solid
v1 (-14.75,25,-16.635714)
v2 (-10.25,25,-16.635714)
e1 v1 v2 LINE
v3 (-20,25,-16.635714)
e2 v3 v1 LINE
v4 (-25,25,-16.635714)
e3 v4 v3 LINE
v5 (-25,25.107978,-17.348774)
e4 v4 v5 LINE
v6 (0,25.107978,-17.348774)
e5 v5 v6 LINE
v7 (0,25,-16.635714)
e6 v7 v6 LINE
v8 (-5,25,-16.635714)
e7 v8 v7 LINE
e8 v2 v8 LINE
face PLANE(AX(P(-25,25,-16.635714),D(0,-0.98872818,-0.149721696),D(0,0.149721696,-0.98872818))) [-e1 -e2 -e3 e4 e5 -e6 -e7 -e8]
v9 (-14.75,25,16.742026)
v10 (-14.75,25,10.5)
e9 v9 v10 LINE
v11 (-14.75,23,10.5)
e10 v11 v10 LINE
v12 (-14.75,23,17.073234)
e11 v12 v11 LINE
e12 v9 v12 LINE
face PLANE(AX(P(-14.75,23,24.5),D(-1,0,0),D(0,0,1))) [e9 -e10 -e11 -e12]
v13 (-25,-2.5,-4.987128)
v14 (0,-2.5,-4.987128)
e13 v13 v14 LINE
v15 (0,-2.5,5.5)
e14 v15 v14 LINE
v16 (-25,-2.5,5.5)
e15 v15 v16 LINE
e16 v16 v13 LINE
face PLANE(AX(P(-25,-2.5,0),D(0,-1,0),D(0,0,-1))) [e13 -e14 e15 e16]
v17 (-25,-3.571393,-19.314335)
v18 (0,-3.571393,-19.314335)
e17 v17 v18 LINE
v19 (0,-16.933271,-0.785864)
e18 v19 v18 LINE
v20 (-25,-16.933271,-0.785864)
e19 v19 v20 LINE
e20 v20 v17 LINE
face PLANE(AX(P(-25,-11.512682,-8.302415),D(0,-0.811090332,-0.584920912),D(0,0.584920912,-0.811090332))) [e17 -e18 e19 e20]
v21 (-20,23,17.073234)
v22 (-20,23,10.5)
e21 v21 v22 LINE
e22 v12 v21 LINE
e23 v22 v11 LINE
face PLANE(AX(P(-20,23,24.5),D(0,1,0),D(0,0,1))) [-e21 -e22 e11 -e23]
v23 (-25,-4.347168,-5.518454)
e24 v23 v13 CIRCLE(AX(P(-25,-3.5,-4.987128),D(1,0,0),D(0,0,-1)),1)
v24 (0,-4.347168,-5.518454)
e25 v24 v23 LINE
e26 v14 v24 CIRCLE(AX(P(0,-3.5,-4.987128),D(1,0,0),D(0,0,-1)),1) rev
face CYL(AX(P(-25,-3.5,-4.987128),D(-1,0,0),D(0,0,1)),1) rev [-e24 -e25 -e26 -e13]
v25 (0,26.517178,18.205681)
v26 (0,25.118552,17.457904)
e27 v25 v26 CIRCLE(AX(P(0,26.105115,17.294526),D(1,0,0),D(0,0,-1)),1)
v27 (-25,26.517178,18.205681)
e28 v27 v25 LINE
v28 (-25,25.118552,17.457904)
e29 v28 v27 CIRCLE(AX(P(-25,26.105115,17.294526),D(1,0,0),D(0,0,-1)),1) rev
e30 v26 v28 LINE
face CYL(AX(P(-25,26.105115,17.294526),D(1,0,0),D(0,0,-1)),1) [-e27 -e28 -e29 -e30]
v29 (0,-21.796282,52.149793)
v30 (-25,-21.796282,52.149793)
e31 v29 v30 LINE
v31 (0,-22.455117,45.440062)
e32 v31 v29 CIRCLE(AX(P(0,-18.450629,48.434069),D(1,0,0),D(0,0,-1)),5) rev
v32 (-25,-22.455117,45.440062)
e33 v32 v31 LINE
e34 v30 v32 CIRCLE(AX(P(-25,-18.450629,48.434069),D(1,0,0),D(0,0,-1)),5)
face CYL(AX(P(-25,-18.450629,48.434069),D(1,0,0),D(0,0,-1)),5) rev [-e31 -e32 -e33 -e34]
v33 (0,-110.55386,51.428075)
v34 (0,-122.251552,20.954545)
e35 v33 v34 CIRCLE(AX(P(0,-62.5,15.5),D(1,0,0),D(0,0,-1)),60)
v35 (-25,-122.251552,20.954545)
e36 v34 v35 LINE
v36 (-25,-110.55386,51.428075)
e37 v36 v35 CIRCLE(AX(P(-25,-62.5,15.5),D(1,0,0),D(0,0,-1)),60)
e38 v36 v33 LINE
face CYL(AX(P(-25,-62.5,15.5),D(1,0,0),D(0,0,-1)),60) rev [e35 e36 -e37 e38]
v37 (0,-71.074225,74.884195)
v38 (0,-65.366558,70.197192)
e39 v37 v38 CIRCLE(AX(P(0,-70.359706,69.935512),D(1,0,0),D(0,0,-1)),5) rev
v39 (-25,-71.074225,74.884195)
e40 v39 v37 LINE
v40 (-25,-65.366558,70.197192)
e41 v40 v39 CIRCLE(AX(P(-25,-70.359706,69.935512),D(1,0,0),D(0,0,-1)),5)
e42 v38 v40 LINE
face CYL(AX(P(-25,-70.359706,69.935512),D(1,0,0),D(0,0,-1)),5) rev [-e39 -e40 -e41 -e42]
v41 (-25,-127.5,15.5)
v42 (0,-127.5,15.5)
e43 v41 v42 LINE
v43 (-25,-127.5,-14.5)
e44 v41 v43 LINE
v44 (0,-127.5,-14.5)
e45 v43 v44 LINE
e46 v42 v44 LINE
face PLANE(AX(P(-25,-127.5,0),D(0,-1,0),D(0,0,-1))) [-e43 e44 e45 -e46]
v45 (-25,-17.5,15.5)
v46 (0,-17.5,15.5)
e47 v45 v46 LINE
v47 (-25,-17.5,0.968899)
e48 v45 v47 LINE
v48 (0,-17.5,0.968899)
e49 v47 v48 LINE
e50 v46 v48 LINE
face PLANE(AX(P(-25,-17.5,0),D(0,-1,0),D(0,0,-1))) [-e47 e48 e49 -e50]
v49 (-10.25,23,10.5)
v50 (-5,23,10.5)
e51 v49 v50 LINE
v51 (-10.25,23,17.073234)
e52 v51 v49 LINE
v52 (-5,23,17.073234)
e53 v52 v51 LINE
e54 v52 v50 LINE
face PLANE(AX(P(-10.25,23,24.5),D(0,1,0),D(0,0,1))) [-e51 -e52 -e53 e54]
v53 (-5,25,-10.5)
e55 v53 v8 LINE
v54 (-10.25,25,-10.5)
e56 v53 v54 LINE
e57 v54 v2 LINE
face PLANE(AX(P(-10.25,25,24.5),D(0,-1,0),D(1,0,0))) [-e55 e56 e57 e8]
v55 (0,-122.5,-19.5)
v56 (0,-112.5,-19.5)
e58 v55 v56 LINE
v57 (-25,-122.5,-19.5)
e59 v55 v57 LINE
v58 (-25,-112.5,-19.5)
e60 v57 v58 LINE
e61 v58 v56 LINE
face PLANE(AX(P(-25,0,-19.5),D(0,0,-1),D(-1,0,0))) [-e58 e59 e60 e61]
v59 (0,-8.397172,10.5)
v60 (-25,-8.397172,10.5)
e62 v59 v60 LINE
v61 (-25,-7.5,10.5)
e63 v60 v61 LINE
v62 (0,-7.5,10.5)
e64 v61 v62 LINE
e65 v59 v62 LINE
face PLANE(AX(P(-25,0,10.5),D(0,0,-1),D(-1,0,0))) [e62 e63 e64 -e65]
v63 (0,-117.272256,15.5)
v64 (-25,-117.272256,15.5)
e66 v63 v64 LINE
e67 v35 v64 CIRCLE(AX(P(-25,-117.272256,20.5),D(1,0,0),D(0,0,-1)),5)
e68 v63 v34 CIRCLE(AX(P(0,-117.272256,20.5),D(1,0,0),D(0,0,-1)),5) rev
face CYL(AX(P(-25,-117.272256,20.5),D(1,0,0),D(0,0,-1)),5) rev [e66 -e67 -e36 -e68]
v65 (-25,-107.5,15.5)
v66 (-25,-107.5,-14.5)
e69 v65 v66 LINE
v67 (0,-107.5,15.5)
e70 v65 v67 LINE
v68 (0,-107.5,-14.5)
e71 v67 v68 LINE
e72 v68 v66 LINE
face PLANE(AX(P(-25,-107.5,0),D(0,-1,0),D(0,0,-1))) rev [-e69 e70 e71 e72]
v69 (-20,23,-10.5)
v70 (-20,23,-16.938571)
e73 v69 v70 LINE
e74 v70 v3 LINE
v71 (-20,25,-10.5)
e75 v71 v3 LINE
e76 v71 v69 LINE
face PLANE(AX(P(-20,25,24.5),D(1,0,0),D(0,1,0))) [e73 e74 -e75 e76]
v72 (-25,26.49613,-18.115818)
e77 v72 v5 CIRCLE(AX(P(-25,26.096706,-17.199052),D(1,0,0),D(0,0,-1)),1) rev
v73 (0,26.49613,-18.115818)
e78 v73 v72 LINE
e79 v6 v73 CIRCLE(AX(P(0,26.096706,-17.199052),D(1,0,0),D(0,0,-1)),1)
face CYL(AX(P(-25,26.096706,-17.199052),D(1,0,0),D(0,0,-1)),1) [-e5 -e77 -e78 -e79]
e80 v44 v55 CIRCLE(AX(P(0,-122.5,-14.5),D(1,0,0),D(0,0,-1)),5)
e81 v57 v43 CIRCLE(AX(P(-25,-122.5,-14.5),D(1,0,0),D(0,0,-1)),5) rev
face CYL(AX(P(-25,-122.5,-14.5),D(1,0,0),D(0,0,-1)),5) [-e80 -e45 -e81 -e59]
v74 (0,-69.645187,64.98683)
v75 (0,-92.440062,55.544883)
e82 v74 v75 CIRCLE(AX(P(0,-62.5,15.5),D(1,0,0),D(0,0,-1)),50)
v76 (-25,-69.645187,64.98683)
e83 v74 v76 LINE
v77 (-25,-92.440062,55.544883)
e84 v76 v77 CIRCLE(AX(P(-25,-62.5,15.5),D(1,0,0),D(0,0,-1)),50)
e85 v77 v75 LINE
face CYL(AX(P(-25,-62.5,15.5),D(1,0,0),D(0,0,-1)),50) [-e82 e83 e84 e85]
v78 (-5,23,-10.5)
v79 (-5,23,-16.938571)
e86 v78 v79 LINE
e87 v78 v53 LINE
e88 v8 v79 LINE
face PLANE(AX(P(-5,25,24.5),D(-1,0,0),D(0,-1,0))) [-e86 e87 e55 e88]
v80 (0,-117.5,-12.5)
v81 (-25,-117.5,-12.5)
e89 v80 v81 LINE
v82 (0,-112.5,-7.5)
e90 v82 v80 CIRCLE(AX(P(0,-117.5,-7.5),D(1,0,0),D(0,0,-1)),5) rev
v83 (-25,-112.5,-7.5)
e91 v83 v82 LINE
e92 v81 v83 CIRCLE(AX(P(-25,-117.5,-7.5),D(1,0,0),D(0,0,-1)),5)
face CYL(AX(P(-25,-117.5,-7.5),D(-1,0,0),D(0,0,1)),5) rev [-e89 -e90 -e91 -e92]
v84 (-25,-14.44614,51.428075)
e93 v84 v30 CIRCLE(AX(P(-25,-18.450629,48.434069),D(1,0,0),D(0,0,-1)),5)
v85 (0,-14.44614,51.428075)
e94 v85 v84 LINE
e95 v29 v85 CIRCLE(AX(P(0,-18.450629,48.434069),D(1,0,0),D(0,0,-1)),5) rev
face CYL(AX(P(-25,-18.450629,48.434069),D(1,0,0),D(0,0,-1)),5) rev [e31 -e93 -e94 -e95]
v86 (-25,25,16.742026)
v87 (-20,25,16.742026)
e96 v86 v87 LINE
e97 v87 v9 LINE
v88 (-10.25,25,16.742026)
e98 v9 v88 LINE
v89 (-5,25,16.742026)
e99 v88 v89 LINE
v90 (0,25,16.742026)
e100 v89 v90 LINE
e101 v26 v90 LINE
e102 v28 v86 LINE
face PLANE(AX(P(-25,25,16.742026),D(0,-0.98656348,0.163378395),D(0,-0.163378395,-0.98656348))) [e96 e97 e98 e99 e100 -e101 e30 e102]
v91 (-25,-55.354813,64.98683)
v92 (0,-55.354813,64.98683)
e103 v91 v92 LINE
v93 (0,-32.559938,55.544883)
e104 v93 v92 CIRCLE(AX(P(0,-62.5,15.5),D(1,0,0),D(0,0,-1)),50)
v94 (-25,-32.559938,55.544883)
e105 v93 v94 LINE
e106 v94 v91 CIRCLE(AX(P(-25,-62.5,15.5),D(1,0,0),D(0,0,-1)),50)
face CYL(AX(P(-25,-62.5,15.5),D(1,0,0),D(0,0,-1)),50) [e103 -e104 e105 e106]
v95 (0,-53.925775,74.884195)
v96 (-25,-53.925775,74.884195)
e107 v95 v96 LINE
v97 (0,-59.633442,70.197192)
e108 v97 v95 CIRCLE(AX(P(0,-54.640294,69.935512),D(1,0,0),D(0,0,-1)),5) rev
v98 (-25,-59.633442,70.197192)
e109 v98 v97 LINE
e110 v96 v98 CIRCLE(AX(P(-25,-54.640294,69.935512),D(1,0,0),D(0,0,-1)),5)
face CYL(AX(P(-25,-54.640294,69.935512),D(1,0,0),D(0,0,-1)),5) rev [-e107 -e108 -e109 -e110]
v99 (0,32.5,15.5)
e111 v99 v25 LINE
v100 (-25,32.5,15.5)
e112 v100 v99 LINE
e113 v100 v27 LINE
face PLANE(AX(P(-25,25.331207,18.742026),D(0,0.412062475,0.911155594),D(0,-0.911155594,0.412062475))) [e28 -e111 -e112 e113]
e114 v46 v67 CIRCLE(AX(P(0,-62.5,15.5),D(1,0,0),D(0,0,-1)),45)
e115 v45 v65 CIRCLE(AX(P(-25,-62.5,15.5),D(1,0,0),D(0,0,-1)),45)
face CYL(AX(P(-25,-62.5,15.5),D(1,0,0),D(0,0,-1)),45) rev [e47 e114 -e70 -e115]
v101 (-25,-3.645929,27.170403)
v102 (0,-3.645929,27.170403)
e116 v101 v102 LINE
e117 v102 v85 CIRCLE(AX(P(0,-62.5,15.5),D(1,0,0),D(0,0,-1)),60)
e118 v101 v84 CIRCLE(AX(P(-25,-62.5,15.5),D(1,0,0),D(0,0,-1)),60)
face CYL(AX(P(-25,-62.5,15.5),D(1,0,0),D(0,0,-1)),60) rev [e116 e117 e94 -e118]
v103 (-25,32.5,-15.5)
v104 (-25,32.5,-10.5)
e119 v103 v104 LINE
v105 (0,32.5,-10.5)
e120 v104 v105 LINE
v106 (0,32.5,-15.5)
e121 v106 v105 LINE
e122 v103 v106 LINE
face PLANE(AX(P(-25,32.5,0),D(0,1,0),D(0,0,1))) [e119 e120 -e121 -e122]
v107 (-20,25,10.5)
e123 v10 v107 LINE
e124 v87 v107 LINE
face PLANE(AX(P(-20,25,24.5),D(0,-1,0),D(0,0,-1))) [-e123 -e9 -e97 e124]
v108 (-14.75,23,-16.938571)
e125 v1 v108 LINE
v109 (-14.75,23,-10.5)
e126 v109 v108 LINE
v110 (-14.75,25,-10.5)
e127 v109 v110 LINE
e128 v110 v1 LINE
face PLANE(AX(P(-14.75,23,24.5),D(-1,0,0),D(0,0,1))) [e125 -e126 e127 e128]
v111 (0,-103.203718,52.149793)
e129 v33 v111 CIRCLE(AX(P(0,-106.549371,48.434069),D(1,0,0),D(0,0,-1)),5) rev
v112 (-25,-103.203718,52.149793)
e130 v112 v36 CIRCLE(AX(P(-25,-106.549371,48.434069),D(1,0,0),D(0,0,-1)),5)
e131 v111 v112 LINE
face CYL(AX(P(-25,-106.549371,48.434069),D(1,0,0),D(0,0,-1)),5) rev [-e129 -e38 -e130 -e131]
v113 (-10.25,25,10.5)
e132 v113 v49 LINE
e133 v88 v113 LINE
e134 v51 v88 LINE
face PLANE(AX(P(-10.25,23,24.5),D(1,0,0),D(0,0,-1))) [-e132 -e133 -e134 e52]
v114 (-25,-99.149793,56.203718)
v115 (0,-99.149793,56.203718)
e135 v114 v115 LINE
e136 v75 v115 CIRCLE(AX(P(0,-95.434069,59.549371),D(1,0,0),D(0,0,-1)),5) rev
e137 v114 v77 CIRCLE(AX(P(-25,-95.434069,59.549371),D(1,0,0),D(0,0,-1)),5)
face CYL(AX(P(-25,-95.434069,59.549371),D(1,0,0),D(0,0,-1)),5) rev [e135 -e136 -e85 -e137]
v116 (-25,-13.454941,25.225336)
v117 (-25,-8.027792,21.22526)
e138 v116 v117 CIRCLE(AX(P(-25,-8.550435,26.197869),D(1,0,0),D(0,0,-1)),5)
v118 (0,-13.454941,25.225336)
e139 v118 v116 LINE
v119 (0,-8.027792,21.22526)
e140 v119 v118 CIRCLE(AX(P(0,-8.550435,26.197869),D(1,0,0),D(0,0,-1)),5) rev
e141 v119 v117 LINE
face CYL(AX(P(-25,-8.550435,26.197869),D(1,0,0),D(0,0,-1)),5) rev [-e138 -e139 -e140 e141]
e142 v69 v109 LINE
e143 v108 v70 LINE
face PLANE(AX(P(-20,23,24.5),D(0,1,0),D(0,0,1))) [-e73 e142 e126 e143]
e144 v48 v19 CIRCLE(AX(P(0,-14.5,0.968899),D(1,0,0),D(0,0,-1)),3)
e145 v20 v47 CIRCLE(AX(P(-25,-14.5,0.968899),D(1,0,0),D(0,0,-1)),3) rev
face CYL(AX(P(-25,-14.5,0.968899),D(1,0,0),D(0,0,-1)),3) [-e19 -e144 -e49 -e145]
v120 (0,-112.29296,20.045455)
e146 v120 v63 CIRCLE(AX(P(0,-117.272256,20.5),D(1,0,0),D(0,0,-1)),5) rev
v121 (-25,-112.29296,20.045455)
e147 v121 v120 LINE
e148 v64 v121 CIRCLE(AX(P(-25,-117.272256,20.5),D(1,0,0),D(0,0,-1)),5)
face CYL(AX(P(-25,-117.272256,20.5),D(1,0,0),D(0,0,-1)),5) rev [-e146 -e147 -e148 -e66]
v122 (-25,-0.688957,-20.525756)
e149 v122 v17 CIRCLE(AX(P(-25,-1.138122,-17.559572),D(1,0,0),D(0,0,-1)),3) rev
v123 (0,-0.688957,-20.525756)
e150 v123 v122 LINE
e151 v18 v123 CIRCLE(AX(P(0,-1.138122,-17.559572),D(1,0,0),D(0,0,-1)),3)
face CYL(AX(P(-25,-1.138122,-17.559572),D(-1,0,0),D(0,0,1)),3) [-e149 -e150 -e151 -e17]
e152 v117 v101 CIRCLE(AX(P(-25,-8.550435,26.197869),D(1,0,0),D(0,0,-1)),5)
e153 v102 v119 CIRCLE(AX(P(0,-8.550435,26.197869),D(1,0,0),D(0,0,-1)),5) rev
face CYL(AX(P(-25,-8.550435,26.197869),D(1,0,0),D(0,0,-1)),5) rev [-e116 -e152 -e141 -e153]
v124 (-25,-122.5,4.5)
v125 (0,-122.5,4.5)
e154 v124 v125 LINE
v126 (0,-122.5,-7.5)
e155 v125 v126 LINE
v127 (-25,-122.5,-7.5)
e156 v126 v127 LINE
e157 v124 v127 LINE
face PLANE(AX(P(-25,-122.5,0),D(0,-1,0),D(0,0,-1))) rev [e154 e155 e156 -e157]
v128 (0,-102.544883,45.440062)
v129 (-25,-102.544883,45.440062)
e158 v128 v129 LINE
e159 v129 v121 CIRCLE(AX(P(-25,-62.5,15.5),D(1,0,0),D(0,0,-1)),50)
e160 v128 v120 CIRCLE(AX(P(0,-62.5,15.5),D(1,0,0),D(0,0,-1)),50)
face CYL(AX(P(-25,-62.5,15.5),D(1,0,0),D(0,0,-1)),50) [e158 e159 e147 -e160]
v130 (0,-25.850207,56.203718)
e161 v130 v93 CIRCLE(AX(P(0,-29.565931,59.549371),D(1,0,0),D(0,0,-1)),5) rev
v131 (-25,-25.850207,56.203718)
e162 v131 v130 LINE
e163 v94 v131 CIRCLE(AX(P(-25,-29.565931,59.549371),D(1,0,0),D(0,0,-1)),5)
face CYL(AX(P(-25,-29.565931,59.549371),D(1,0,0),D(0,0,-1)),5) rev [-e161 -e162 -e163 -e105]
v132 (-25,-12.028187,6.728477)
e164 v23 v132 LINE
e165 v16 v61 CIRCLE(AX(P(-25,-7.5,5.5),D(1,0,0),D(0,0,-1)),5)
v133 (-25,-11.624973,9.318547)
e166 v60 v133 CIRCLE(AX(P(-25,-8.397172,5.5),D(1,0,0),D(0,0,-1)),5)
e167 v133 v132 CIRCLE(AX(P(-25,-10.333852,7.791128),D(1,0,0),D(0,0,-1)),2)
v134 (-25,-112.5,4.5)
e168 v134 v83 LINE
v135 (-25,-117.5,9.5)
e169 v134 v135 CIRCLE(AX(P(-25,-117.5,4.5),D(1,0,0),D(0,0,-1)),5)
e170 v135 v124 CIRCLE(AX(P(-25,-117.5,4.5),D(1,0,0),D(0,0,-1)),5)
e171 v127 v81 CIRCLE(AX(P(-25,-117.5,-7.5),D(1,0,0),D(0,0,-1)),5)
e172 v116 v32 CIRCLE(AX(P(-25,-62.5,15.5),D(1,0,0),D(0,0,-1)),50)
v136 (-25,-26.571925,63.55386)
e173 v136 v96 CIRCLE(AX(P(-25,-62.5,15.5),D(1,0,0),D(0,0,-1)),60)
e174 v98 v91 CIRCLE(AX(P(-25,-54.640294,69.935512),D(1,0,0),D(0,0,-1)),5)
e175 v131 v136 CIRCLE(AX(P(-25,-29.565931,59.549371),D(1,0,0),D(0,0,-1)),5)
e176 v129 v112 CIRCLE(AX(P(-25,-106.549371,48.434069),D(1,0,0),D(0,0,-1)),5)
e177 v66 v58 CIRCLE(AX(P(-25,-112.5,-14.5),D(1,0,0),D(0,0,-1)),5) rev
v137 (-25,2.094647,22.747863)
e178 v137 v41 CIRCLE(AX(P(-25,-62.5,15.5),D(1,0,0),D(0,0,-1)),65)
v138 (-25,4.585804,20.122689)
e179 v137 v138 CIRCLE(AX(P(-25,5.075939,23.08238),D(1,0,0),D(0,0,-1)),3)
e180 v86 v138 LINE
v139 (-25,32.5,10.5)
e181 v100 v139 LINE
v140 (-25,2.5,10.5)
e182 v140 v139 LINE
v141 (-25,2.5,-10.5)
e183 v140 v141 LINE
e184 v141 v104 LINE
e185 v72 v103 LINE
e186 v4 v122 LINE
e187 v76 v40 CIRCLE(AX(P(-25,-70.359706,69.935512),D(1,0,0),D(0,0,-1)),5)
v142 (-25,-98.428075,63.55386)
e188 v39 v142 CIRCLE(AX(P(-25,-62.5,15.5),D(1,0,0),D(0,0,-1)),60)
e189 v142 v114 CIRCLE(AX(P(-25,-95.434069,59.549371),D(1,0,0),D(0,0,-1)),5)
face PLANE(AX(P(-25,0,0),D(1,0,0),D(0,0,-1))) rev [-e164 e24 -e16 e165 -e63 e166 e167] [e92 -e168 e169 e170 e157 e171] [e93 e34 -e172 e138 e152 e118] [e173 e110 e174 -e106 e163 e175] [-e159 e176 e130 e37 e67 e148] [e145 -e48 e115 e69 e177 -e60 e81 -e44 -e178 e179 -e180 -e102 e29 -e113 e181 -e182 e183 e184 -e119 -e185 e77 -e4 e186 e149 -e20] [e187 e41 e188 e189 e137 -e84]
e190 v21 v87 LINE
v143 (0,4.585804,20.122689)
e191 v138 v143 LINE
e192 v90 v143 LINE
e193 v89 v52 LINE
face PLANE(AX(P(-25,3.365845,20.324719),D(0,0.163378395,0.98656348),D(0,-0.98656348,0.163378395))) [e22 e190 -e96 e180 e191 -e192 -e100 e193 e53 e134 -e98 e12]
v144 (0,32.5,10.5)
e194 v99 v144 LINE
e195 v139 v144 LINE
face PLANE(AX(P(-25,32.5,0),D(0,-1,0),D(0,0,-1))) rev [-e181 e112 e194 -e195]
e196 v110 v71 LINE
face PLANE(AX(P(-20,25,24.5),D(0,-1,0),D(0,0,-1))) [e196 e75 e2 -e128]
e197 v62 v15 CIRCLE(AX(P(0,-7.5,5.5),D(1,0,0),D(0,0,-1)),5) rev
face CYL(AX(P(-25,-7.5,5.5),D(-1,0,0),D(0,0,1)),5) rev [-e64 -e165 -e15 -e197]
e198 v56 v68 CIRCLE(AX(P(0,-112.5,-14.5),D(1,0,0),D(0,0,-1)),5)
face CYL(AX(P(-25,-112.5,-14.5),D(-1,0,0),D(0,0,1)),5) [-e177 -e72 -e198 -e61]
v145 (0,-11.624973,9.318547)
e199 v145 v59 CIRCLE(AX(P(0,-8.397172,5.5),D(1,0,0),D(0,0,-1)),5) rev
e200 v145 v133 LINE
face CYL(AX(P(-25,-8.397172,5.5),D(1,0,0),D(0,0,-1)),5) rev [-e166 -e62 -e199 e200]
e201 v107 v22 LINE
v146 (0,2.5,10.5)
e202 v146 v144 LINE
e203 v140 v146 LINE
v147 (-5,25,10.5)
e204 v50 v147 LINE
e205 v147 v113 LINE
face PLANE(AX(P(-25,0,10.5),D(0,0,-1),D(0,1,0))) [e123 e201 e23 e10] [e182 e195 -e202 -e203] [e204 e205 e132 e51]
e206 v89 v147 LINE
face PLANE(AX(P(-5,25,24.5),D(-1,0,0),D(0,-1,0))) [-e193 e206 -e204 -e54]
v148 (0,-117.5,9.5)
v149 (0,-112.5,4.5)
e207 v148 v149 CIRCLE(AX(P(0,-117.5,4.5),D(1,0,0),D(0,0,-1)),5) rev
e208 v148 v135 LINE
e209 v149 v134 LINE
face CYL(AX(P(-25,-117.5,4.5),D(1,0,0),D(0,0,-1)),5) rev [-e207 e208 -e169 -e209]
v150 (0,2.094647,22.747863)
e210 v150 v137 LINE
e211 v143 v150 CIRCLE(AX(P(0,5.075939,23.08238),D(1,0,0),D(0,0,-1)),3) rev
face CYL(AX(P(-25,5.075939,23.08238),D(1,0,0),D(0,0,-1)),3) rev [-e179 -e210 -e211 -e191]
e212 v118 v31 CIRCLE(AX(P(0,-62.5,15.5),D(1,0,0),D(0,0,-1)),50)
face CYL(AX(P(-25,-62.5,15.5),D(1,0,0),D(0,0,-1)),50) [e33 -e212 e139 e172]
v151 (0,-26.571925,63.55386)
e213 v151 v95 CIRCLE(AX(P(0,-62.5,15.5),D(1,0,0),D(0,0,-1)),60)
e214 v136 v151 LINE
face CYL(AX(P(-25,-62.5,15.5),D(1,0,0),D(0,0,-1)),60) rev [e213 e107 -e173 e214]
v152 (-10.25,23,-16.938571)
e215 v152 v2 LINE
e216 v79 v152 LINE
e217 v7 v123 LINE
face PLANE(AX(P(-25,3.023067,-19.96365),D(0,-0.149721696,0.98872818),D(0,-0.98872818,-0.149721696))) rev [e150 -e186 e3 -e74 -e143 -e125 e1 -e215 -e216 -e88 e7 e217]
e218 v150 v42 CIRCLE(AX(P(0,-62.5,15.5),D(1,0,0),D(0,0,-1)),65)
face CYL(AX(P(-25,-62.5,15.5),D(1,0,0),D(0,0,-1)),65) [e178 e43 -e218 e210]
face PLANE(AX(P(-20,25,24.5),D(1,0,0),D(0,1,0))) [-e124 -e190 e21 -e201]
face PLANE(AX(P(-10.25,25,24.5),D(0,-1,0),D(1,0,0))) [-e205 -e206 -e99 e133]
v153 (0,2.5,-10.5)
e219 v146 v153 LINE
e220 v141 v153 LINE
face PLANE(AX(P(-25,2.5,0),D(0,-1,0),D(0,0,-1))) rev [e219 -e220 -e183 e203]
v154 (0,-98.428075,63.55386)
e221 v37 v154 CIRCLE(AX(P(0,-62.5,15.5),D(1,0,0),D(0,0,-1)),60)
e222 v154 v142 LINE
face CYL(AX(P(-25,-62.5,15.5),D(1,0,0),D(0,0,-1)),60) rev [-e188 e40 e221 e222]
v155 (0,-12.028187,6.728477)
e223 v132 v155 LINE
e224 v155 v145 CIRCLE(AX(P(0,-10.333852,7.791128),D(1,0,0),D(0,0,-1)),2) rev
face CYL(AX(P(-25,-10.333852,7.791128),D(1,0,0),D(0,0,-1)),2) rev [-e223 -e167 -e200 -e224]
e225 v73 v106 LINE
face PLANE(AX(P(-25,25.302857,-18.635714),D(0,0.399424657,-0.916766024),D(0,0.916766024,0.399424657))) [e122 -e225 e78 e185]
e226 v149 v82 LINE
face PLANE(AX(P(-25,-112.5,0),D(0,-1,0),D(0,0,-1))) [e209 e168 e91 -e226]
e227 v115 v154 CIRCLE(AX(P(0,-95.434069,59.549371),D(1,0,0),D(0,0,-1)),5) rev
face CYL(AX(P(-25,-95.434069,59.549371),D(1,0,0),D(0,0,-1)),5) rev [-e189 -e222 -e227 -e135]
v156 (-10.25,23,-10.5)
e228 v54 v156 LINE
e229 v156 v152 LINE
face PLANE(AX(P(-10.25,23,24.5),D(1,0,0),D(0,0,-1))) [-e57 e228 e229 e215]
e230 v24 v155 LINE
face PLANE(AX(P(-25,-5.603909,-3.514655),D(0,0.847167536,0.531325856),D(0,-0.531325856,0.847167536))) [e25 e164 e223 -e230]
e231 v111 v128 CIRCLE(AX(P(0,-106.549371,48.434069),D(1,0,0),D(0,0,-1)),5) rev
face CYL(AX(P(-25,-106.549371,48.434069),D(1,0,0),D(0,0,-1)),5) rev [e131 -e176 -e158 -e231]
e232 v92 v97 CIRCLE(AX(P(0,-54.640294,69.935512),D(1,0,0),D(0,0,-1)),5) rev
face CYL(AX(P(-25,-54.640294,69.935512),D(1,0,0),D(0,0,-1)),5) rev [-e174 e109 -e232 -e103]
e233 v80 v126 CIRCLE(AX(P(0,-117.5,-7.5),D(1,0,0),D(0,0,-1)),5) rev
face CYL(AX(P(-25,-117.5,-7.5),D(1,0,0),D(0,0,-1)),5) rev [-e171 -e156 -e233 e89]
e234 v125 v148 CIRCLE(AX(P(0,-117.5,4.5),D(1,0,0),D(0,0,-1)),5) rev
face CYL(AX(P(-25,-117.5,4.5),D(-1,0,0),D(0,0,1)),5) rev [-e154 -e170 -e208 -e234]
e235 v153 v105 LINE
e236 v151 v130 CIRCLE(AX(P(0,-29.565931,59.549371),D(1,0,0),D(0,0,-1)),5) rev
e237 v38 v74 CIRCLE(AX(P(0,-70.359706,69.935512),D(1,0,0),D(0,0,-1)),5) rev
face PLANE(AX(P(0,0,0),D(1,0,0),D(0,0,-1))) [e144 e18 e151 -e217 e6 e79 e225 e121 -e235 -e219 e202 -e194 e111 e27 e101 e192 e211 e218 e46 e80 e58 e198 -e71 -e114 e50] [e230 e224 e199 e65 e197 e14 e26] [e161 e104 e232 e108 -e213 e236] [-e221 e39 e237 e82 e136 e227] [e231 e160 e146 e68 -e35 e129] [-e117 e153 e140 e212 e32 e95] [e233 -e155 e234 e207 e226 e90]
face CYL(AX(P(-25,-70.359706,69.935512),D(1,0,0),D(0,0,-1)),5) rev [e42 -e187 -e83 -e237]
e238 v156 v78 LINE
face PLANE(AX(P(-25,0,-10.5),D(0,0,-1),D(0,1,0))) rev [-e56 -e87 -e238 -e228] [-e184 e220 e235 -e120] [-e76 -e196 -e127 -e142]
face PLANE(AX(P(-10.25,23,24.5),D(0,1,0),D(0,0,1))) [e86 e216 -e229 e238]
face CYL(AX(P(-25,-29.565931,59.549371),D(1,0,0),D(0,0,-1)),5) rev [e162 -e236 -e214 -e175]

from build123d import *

# Parameters (mm, degrees)
SKETCH1_W               = 22
SKETCH1_H               = 10
BOSS_EXTRUDE1_DEPTH     = 25
FILLET1_R               = 5
FILLET2_R               = 5
FILLET3_R               = 5
FILLET4_R               = 5
FILLET5_R               = 2
FILLET6_R               = 1
FILLET7_R               = 3
FILLET8_R               = 5
CUT_EXTRUDE1_DEPTH      = 35
CUT_EXTRUDE1_DEPTH_BACK = 25
SKETCH2_W               = 5.25
SKETCH2_H               = 2
BOSS_EXTRUDE2_DEPTH     = 25
FILLET9_R               = 1


# Some blends are built 0.0001 mm under size
with BuildPart() as part:
    # Sketch1 → Boss-Extrude1 (new body)
    with BuildSketch(Plane(origin=(0, 0, 0), x_dir=(0, 0, -1), z_dir=(1, 0, 0))):
        with BuildLine():
            ThreePointArc((-15.5, -17.5), (-60.5, -62.5), (-15.5, -107.5))
            Line((-15.5, -107.5), (19.5, -107.5))
            Line((19.5, -107.5), (19.5, -127.5))
            Line((19.5, -127.5), (-15.5, -127.5))
            ThreePointArc((-15.5, -127.5), (-80.4518339, -65.001853916), (-20.5, 2.307406984))
            Line((-20.5, 2.307406984), (-15.5, 32.5))
            Line((-15.5, 32.5), (-10.5, 32.5))
            Line((-10.5, 32.5), (-10.5, 2.5))
            Line((-10.5, 2.5), (10.5, 2.5))
            Line((10.5, 2.5), (10.5, 32.5))
            Line((10.5, 32.5), (15.5, 32.5))
            Line((15.5, 32.5), (20.8, -2.5))
            Line((20.8, -2.5), (0, -17.5))
            Line((0, -17.5), (-15.5, -17.5))
        make_face()
        with BuildLine():
            ThreePointArc((-55.647836382, -107.088689529), (-37.002076973, -118.51482559), (-15.5, -122.5))
            Line((-15.5, -122.5), (-15.5, -112.5))
            ThreePointArc((-15.5, -112.5), (-33.418397477, -109.179021325), (-48.956530318, -99.657241274))
            Line((-48.956530318, -99.657241274), (-55.647836382, -107.088689529))
        make_face(mode=Mode.SUBTRACT)
        with BuildLine():
            ThreePointArc((-60.088689529, -22.352163618), (-70.932771951, -39.538994058), (-75.417772085, -59.359842625))
            Line((-75.417772085, -59.359842625), (-65.431476738, -59.883202188))
            ThreePointArc((-65.431476738, -59.883202188), (-61.693976626, -43.365828382), (-52.657241274, -29.043469682))
            Line((-52.657241274, -29.043469682), (-60.088689529, -22.352163618))
        make_face(mode=Mode.SUBTRACT)
        with BuildLine():
            ThreePointArc((-21.771707796, -2.828686278), (-39.904198585, -7.687272541), (-55.647836382, -17.911310471))
            Line((-55.647836382, -17.911310471), (-48.956530318, -25.342758726))
            ThreePointArc((-48.956530318, -25.342758726), (-35.836832154, -16.822727118), (-20.726423163, -12.773905232))
            Line((-20.726423163, -12.773905232), (-21.771707796, -2.828686278))
        make_face(mode=Mode.SUBTRACT)
        Polygon((8.463652775, -2.5), (-7.917479229, -12.773905232), (-10.5, -12.773905232), (-10.5, -2.5), align=None, mode=Mode.SUBTRACT)
        with Locations((1.5, -117.5)):
            Rectangle(SKETCH1_W, SKETCH1_H, mode=Mode.SUBTRACT)
        with BuildLine():
            Line((-65.431476738, -65.116797812), (-75.417772085, -65.640157375))
            ThreePointArc((-75.417772085, -65.640157375), (-70.932771951, -85.461005942), (-60.088689529, -102.647836382))
            Line((-60.088689529, -102.647836382), (-52.657241274, -95.956530318))
            ThreePointArc((-52.657241274, -95.956530318), (-61.693976626, -81.634171618), (-65.431476738, -65.116797812))
        make_face(mode=Mode.SUBTRACT)
    extrude(amount=-BOSS_EXTRUDE1_DEPTH)

    # Fillet1
    fillet1_edges = [part.edges().sort_by_distance(p)[0] for p in [
        (-12.5, -99.657241274, 48.956530318),
        (-12.5, -112.5, 9.5),
        (-12.5, -122.5, 9.5),
        (-12.5, -122.5, 15.5),
        (-12.5, -122.5, -12.5),
        (-12.5, -112.5, -12.5),
        (-12.5, -107.088689529, 55.647836382),
        (-12.5, -112.5, 15.5),
        (-12.5, -95.956530318, 52.657241274),
        (-12.5, -102.647836382, 60.088689529),
        (-12.5, -22.352163618, 60.088689529),
        (-12.5, -29.043469682, 52.657241274),
        (-12.5, -59.883202188, 65.431476738),
        (-12.5, -59.359842625, 75.417772085),
        (-12.5, -17.911310471, 55.647836382),
        (-12.5, -25.342758726, 48.956530318),
        (-12.5, -12.773905232, 20.726423163),
        (-12.5, -2.828686278, 21.771707796),
    ]]
    fillet(fillet1_edges, radius=FILLET1_R - 0.0001)  # a hair under: the kernel refuses the full size

    # Fillet2
    fillet2_edges = [part.edges().sort_by_distance(p)[0] for p in [
        (-12.5, -65.116797812, 65.431476738),
        (-12.5, -65.640157375, 75.417772085),
    ]]
    fillet(fillet2_edges, radius=FILLET2_R - 0.0001)  # a hair under: the kernel refuses the full size

    # Fillet3
    fillet3_edges = [part.edges().sort_by_distance(p)[0] for p in [
        (-12.5, -2.5, 10.5),
    ]]
    fillet(fillet3_edges, radius=FILLET3_R)

    # Fillet4
    # the kernel refuses this fillet: 5 mm, written as the material it adds along each edge
    with BuildSketch(Plane(origin=(0, -12.773905232, 10.5), x_dir=(0, 1, 0), z_dir=(-1, 0, 0))) as fillet4_piece_1:
        with BuildLine():
            CenterArc((4.376733277, 5), FILLET4_R, 208.91397124, 61.08602876)
            Line((0, 2.582520771), (-0.087534666, 2.534171187))
            ThreePointArc((-0.087534666, 2.534171187), (-0.1, 1.291260386), (-0.1, 0))
            Line((-0.1, 0), (0, -0.1))
            Line((0, -0.1), (4.376733277, -0.1))
            Line((4.376733277, -0.1), (4.376733277, 0))
        make_face()
    extrude(amount=25)

    # Fillet5
    fillet5_edges = [part.edges().sort_by_distance(p)[0] for p in [
        (-12.5, -12.773905232, 7.917479229),
    ]]
    fillet(fillet5_edges, radius=FILLET5_R)

    # Fillet6
    fillet6_edges = [part.edges().sort_by_distance(p)[0] for p in [
        (-12.5, -2.5, -8.463652775),
    ]]
    fillet(fillet6_edges, radius=FILLET6_R)

    # Fillet7
    fillet7_edges = [part.edges().sort_by_distance(p)[0] for p in [
        (-12.5, 2.307406984, 20.5),
        (-12.5, -2.5, -20.8),
        (-12.5, -17.5, 0),
    ]]
    fillet(fillet7_edges, radius=FILLET7_R)

    # Fillet8
    fillet8_edges = [part.edges().sort_by_distance(p)[0] for p in [
        (-12.5, -107.5, -19.5),
        (-12.5, -127.5, -19.5),
    ]]
    fillet(fillet8_edges, radius=FILLET8_R)

    # Sketch2 → Cut-Extrude1 (cut, two sides: drawn at the far end of the back side and taken through both)
    with BuildSketch(Plane.XY.offset(-10.5).offset(-CUT_EXTRUDE1_DEPTH_BACK)):
        with Locations((-17.375, 24)):
            Rectangle(SKETCH2_W, SKETCH2_H)
        with Locations((-7.625, 24)):
            Rectangle(SKETCH2_W, SKETCH2_H)
    extrude(amount=CUT_EXTRUDE1_DEPTH + CUT_EXTRUDE1_DEPTH_BACK, mode=Mode.SUBTRACT)

    # Sketch3 → Boss-Extrude2 (add)
    with BuildSketch(Plane(origin=(0, 0, 0), x_dir=(0, 0, -1), z_dir=(1, 0, 0))):
        Polygon((16.635714286, 25), (18.635714286, 25.302857143), (15.5, 32.5), align=None)
        Polygon((-16.742026479, 25), (-18.742026479, 25.331207061), (-15.5, 32.5), align=None)
    extrude(amount=-BOSS_EXTRUDE2_DEPTH)

    # Fillet9
    fillet9_edges = [part.edges().sort_by_distance(p)[0] for p in [
        (-12.5, 25.302857143, -18.635714286),
        (-12.5, 25.331207061, 18.742026479),
    ]]
    fillet(fillet9_edges, radius=FILLET9_R)


solid = part.part
